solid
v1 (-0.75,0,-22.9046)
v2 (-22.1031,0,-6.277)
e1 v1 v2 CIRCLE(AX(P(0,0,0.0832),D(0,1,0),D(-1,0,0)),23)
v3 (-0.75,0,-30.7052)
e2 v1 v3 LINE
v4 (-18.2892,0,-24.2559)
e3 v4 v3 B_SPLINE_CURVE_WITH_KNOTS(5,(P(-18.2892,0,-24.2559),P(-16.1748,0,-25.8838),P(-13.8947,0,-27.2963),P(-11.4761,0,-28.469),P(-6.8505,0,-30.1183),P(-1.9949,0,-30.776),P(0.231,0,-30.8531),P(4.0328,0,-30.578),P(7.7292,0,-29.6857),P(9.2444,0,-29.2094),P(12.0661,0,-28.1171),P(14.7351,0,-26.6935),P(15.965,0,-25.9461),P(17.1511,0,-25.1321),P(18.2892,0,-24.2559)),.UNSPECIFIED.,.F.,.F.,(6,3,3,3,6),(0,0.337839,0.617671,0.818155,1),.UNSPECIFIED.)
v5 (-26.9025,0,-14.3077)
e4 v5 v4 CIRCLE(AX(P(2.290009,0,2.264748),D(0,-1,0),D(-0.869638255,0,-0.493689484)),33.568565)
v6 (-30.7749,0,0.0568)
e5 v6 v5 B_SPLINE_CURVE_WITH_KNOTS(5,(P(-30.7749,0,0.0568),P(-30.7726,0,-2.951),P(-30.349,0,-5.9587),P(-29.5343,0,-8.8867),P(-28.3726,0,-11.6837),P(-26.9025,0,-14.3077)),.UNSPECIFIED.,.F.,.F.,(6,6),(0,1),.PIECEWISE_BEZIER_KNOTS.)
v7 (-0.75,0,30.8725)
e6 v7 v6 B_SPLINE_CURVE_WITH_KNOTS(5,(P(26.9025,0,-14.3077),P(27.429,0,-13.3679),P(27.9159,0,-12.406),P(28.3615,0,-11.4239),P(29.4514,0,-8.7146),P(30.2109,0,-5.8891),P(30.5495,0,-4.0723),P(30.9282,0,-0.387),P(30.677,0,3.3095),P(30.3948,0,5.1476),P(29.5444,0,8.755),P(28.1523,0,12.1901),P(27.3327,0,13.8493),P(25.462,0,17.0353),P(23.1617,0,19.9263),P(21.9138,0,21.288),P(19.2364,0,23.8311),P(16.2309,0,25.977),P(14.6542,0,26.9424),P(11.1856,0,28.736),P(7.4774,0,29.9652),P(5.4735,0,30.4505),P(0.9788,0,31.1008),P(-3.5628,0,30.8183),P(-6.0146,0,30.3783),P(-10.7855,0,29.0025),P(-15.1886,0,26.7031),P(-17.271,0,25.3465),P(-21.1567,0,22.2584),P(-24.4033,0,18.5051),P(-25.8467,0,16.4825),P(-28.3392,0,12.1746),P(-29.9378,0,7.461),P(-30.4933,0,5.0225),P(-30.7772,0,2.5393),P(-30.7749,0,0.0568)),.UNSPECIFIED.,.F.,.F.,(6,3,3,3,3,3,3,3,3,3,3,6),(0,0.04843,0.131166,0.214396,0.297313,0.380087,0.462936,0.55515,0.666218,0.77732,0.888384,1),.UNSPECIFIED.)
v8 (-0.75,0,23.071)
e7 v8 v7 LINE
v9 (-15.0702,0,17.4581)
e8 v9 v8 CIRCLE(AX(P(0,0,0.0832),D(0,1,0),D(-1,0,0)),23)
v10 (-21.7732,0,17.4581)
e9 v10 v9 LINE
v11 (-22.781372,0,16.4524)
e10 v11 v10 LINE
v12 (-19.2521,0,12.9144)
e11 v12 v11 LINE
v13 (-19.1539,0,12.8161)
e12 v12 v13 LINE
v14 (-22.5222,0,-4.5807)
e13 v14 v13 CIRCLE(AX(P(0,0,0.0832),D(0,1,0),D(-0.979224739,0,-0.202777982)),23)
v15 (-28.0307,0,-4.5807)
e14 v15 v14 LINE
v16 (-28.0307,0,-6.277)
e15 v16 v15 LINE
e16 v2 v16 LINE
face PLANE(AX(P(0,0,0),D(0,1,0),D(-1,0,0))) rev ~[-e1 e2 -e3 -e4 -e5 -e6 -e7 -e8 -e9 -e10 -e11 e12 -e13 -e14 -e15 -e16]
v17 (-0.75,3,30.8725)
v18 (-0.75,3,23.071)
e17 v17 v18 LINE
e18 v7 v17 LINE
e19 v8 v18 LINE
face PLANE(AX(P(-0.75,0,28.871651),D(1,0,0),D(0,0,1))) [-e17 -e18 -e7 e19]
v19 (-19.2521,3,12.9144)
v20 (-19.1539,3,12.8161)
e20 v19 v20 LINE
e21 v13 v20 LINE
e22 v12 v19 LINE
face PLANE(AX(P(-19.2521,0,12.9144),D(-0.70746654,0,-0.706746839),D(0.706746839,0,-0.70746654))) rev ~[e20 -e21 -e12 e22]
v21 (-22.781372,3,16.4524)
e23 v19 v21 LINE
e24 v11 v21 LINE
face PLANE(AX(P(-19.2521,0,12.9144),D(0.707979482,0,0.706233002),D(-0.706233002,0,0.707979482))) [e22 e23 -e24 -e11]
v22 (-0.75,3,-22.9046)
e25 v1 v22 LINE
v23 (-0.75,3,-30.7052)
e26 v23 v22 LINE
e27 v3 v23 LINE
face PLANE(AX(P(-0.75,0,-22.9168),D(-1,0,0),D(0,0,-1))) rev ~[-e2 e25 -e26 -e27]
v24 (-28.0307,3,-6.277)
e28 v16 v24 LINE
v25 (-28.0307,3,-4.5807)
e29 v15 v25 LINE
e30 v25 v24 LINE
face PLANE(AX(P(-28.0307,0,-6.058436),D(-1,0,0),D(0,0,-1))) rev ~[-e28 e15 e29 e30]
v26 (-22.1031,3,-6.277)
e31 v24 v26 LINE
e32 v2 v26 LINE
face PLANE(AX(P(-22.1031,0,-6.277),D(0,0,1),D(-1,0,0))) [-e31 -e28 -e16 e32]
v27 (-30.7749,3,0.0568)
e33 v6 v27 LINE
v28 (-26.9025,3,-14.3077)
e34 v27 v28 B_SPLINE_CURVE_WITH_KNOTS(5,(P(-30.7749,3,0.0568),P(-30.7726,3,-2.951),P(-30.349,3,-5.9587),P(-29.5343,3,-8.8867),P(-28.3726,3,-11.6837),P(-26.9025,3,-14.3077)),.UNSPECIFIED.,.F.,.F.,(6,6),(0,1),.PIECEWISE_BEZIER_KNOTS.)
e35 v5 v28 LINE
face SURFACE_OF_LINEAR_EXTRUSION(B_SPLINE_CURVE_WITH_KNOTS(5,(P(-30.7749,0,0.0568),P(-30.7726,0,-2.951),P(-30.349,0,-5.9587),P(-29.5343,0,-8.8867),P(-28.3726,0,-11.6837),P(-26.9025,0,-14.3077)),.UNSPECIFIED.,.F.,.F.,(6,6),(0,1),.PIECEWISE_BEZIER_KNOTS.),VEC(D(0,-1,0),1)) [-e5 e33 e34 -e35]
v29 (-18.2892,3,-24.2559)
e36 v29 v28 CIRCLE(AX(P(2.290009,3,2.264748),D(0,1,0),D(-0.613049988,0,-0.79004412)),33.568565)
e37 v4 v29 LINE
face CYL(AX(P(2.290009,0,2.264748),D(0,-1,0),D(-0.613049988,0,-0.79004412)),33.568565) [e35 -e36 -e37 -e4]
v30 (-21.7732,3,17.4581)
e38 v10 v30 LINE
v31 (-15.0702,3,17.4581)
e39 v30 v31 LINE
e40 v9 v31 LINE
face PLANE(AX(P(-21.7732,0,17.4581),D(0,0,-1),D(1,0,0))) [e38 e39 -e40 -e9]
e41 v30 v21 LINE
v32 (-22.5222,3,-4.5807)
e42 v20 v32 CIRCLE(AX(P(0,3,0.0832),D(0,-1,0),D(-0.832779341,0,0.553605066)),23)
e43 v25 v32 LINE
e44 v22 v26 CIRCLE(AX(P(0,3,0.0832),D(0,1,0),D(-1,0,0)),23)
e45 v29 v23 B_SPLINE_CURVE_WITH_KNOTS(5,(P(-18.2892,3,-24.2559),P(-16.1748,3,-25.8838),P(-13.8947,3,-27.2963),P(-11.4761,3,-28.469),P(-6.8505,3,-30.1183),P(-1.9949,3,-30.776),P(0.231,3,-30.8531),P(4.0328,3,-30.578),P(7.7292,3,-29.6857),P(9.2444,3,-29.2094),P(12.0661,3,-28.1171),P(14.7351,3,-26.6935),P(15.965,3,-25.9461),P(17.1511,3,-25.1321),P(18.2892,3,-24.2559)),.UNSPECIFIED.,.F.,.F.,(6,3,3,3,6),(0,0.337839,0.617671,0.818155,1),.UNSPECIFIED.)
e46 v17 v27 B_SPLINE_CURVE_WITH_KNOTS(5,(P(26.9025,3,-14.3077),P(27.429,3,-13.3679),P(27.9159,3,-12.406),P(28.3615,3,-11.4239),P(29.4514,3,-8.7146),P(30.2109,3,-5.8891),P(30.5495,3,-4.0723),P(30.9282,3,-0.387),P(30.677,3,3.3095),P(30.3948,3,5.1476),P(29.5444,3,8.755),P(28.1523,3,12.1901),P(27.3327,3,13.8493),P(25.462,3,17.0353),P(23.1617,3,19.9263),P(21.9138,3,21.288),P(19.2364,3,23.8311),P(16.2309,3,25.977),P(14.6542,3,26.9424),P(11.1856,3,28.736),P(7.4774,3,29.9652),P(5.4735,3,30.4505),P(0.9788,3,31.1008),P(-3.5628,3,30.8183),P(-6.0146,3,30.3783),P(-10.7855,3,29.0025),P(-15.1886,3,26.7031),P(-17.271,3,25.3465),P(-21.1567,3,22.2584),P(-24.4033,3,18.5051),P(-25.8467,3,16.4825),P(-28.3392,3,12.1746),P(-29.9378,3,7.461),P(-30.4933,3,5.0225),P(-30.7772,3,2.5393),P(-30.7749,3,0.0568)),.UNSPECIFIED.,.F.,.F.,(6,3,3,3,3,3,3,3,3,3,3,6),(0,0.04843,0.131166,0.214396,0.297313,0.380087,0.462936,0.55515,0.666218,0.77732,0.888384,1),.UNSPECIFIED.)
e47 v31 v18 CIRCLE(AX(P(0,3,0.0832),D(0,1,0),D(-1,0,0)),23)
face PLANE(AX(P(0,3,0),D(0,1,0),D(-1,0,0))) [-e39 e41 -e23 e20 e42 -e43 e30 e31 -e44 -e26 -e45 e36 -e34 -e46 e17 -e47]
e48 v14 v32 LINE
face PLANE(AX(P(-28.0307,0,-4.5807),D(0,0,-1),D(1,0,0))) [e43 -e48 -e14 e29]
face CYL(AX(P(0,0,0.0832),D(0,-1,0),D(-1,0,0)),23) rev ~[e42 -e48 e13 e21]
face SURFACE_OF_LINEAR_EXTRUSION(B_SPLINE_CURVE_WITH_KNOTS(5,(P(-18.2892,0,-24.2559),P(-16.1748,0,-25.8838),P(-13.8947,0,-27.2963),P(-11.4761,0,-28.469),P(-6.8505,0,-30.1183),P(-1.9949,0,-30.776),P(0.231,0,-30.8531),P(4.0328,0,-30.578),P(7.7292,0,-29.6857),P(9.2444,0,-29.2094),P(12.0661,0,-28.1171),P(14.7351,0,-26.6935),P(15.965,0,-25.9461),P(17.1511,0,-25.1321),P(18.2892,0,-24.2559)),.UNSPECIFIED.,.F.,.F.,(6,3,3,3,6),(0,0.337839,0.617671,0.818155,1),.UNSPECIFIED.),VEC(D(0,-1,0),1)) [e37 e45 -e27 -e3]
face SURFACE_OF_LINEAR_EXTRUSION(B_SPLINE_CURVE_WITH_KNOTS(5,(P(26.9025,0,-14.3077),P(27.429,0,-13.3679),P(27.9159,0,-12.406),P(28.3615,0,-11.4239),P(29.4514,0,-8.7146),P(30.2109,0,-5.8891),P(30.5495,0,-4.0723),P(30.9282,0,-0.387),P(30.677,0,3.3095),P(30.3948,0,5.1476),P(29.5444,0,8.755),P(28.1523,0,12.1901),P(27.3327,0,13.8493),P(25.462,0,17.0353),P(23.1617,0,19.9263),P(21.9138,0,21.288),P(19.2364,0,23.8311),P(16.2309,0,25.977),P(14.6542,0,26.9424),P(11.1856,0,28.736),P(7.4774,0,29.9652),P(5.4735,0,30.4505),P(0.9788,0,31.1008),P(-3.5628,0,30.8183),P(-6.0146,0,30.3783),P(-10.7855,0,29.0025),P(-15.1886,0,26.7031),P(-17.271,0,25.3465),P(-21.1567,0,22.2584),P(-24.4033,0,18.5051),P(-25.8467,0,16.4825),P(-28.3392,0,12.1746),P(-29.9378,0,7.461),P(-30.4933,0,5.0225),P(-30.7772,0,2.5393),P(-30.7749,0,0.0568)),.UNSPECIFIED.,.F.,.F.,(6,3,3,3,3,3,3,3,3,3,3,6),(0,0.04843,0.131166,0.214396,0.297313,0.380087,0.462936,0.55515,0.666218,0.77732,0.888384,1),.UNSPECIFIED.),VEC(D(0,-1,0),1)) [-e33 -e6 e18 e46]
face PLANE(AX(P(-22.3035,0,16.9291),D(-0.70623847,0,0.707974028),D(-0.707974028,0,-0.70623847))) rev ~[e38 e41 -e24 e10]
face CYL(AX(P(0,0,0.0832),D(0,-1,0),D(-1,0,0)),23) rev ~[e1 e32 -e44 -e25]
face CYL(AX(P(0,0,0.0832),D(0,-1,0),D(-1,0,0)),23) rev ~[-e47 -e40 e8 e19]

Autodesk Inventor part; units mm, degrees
ref_plane "YZ Plane" through (0, 0, 0) normal (1, 0, 0) x (0, 1, 0)
ref_plane "XZ Plane" through (0, 0, 0) normal (0, 1, 0) x (-1, 0, 0)
ref_plane "XY Plane" through (0, 0, 0) normal (0, 0, 1) x (1, 0, 0)
sketch "Sketch1" plane through (0, 0, 0) normal (0, 1, 0) x (-1, 0, 0)
  line L0 (-40, -22.2559) -> (-17.5965, -22.2559) projected
  spline S0 degree 3 poles (-17.5965, -22.2559) (-16.6656, -23.0054) (-15.6914, -23.7008) (-11.4898, -26.3394) (-7.9349, -27.7425) (-1.802, -28.767) (1.7129, -29.0153) (9.4587, -27.1875) (12.7711, -25.6792) (16.3694, -23.2064) (16.9921, -22.7425) (17.5965, -22.2559) knots 1.921938 1.921938 1.921938 1.921938 2.28002 2.28002 3.408568 3.408568 4.146561 4.146561 4.751486 4.751486 4.882227 4.882227 4.882227 4.882227 projected
  line L1 (17.5965, -22.2559) -> (40, -22.2559) projected
  line L2 (40, -22.2559) -> (40, -16.3077) projected
  line L3 (40, -16.3077) -> (23.2525, -16.3077) projected
  spline S1 degree 3 poles (23.2525, -16.3077) (24.6957, -14.3166) (25.8988, -12.1536) (28.0747, -6.71) (28.7719, -3.3404) (28.7749, 0.0586) knots 0.307224 0.307224 0.307224 0.307224 1.04533 1.04533 2.067491 2.067491 2.067491 2.067491 projected
  spline S2 degree 3 poles (28.7749, 0.0586) (28.7778, 3.3432) (28.1322, 6.6023) (25.6023, 13.1892) (23.5632, 16.432) (18.302, 22.1753) (15.0141, 24.6102) (8.1089, 27.8149) (4.5799, 28.7211) (-2.7873, 29.0129) (-6.0815, 28.2969) (-12.2596, 26.1389) (-15.5213, 24.2237) (-21.3931, 19.1817) (-23.9297, 15.9754) (-27.394, 9.1373) (-28.4362, 5.5845) (-28.8291, 0.2785) (-28.786, -1.3758) (-28.2317, -5.891) (-27.4068, -8.6862) (-25.3769, -13.0646) (-24.3891, -14.7396) (-23.2525, -16.3077) knots 0 0 0 0 0.985401 0.985401 2.113862 2.113862 3.316195 3.316195 4.394104 4.394104 5.528611 5.528611 7.023718 7.023718 8.634698 8.634698 10.102311 10.102311 10.775364 10.775364 11.944404 11.944404 12.727759 12.727759 12.727759 12.727759 projected
  line L4 (-23.2525, -16.3077) -> (-40, -16.3077) projected
  line L5 (-40, -16.3077) -> (-40, -22.2559) projected
  circle A0 centre (0, 0.0832) radius 23 projected
  line L6 (0.75, 28.2736) -> (0.75, 23.0832) projected
  line L7 (19.2521, 12.9144) -> (23.1341, 16.806) projected
  line L8 (22.3297, -4.6807) -> (27.9307, -4.6807) projected
  line L9 (27.9307, -6.177) -> (22.3297, -6.177) projected
  line L10 (0.75, -22.9168) -> (0.75, -28.7163) projected
  line L11 (19.2521, 12.9144) -> (19.1539, 12.8161)
  line L12 (26.9025, -14.3077) -> (42, -14.3077)
  line L13 (42, -14.3077) -> (42, -24.2559)
  line L14 (42, -24.2559) -> (18.2892, -24.2559)
  line L15 (-18.2892, -24.2559) -> (-42, -24.2559)
  line L16 (-42, -24.2559) -> (-42, -14.3077)
  line L17 (-42, -14.3077) -> (-26.9025, -14.3077)
  line L18 (22.3035, 16.9291) -> (22.8338, 16.4001) projected
  line L19 (22.3035, 16.9291) -> (21.7732, 17.4581) projected
  line L20 (21.7732, 17.4581) -> (15.0702, 17.4581)
  line L21 (0.75, 28.2736) -> (0.75, 30.8725)
  line L22 (22.3297, -6.177) -> (22.1316, -6.177)
  line L23 (27.9307, -5.4288) -> (27.9307, -4.6807) projected
  line L24 (27.9307, -5.4288) -> (27.9307, -6.177) projected
  line L25 (22.1031, -6.277) -> (27.9768, -6.277)
  line L26 (28.0307, -4.5807) -> (28.0307, -6.277)
  line L27 (28.0307, -6.277) -> (27.9768, -6.277)
  line L28 (28.0307, -4.5807) -> (22.5222, -4.5807)
  arc A1 (18.2892, -24.2559) -> (26.9025, -14.3077) centre (-2.2893, 2.264) ccw
  line L29 (0.75, -28.7163) -> (0.75, -30.7052)
  line L30 (0.75, 23.0832) -> (0.75, 23.071)
  line L31 (0.75, -22.9168) -> (0.75, -22.9046)
  spline S3 degree 5 poles (-26.9025, -14.3077) (-27.429, -13.3679) (-27.9159, -12.406) (-28.3615, -11.4239) (-29.4514, -8.7146) (-30.2109, -5.8891) (-30.5495, -4.0723) (-30.9282, -0.387) (-30.677, 3.3095) (-30.3948, 5.1476) (-29.5444, 8.755) (-28.1523, 12.1901) (-27.3327, 13.8493) (-25.462, 17.0353) (-23.1617, 19.9263) (-21.9138, 21.288) (-19.2364, 23.8311) (-16.2309, 25.977) (-14.6542, 26.9424) (-11.1856, 28.736) (-7.4774, 29.9652) (-5.4735, 30.4505) (-0.9788, 31.1008) (3.5628, 30.8183) (6.0146, 30.3783) (10.7855, 29.0025) (15.1886, 26.7031) (17.271, 25.3465) (21.1567, 22.2584) (24.4033, 18.5051) (25.8467, 16.4825) (28.3392, 12.1746) (29.9378, 7.461) (30.4933, 5.0225) (30.7772, 2.5393) (30.7749, 0.0568) knots 0 0 0 0 0 0 0.04843 0.04843 0.04843 0.131166 0.131166 0.131166 0.214396 0.214396 0.214396 0.297313 0.297313 0.297313 0.380087 0.380087 0.380087 0.462936 0.462936 0.462936 0.55515 0.55515 0.55515 0.666218 0.666218 0.666218 0.77732 0.77732 0.77732 0.888384 0.888384 0.888384 1 1 1 1 1 1
  spline S4 degree 5 poles (30.7749, 0.0568) (30.7726, -2.951) (30.349, -5.9587) (29.5343, -8.8867) (28.3726, -11.6837) (26.9025, -14.3077) knots 0 0 0 0 0 0 1 1 1 1 1 1
  spline S5 degree 5 poles (18.2892, -24.2559) (16.1748, -25.8838) (13.8947, -27.2963) (11.4761, -28.469) (6.8505, -30.1183) (1.9949, -30.776) (-0.231, -30.8531) (-4.0328, -30.578) (-7.7292, -29.6857) (-9.2444, -29.2094) (-12.0661, -28.1171) (-14.7351, -26.6935) (-15.965, -25.9461) (-17.1511, -25.1321) (-18.2892, -24.2559) knots 0 0 0 0 0 0 0.337839 0.337839 0.337839 0.617671 0.617671 0.617671 0.818155 0.818155 0.818155 1 1 1 1 1 1
  point P0 (0, 0)
  point P1 (22.7814, 16.4524)
  dimension "d0" = 2
  dimension "d1" = 0.1
  dimension "d2" = 0.1
  dimension "d3" = 0.1
extrude "Extrusion1" add sketch "Sketch1" along normal blind 3 contours L10 L31 A0 L25 S1 L3 A1 L1 S0 | S0 L1 A1 S5 L29 L10 | L21 S3 S4 A1 L3 S1 L27 L26 S2 | S2 L7 L18 L19 L20 A0 L30 L6 L21 | S2 S1 L26 L28 A0 L11 L7
equation "\"d2\" = slack"
equation "\"d3\" = slack"
equation "\"slack\" = 0.1"
properties part number "Back_back_aligner"
